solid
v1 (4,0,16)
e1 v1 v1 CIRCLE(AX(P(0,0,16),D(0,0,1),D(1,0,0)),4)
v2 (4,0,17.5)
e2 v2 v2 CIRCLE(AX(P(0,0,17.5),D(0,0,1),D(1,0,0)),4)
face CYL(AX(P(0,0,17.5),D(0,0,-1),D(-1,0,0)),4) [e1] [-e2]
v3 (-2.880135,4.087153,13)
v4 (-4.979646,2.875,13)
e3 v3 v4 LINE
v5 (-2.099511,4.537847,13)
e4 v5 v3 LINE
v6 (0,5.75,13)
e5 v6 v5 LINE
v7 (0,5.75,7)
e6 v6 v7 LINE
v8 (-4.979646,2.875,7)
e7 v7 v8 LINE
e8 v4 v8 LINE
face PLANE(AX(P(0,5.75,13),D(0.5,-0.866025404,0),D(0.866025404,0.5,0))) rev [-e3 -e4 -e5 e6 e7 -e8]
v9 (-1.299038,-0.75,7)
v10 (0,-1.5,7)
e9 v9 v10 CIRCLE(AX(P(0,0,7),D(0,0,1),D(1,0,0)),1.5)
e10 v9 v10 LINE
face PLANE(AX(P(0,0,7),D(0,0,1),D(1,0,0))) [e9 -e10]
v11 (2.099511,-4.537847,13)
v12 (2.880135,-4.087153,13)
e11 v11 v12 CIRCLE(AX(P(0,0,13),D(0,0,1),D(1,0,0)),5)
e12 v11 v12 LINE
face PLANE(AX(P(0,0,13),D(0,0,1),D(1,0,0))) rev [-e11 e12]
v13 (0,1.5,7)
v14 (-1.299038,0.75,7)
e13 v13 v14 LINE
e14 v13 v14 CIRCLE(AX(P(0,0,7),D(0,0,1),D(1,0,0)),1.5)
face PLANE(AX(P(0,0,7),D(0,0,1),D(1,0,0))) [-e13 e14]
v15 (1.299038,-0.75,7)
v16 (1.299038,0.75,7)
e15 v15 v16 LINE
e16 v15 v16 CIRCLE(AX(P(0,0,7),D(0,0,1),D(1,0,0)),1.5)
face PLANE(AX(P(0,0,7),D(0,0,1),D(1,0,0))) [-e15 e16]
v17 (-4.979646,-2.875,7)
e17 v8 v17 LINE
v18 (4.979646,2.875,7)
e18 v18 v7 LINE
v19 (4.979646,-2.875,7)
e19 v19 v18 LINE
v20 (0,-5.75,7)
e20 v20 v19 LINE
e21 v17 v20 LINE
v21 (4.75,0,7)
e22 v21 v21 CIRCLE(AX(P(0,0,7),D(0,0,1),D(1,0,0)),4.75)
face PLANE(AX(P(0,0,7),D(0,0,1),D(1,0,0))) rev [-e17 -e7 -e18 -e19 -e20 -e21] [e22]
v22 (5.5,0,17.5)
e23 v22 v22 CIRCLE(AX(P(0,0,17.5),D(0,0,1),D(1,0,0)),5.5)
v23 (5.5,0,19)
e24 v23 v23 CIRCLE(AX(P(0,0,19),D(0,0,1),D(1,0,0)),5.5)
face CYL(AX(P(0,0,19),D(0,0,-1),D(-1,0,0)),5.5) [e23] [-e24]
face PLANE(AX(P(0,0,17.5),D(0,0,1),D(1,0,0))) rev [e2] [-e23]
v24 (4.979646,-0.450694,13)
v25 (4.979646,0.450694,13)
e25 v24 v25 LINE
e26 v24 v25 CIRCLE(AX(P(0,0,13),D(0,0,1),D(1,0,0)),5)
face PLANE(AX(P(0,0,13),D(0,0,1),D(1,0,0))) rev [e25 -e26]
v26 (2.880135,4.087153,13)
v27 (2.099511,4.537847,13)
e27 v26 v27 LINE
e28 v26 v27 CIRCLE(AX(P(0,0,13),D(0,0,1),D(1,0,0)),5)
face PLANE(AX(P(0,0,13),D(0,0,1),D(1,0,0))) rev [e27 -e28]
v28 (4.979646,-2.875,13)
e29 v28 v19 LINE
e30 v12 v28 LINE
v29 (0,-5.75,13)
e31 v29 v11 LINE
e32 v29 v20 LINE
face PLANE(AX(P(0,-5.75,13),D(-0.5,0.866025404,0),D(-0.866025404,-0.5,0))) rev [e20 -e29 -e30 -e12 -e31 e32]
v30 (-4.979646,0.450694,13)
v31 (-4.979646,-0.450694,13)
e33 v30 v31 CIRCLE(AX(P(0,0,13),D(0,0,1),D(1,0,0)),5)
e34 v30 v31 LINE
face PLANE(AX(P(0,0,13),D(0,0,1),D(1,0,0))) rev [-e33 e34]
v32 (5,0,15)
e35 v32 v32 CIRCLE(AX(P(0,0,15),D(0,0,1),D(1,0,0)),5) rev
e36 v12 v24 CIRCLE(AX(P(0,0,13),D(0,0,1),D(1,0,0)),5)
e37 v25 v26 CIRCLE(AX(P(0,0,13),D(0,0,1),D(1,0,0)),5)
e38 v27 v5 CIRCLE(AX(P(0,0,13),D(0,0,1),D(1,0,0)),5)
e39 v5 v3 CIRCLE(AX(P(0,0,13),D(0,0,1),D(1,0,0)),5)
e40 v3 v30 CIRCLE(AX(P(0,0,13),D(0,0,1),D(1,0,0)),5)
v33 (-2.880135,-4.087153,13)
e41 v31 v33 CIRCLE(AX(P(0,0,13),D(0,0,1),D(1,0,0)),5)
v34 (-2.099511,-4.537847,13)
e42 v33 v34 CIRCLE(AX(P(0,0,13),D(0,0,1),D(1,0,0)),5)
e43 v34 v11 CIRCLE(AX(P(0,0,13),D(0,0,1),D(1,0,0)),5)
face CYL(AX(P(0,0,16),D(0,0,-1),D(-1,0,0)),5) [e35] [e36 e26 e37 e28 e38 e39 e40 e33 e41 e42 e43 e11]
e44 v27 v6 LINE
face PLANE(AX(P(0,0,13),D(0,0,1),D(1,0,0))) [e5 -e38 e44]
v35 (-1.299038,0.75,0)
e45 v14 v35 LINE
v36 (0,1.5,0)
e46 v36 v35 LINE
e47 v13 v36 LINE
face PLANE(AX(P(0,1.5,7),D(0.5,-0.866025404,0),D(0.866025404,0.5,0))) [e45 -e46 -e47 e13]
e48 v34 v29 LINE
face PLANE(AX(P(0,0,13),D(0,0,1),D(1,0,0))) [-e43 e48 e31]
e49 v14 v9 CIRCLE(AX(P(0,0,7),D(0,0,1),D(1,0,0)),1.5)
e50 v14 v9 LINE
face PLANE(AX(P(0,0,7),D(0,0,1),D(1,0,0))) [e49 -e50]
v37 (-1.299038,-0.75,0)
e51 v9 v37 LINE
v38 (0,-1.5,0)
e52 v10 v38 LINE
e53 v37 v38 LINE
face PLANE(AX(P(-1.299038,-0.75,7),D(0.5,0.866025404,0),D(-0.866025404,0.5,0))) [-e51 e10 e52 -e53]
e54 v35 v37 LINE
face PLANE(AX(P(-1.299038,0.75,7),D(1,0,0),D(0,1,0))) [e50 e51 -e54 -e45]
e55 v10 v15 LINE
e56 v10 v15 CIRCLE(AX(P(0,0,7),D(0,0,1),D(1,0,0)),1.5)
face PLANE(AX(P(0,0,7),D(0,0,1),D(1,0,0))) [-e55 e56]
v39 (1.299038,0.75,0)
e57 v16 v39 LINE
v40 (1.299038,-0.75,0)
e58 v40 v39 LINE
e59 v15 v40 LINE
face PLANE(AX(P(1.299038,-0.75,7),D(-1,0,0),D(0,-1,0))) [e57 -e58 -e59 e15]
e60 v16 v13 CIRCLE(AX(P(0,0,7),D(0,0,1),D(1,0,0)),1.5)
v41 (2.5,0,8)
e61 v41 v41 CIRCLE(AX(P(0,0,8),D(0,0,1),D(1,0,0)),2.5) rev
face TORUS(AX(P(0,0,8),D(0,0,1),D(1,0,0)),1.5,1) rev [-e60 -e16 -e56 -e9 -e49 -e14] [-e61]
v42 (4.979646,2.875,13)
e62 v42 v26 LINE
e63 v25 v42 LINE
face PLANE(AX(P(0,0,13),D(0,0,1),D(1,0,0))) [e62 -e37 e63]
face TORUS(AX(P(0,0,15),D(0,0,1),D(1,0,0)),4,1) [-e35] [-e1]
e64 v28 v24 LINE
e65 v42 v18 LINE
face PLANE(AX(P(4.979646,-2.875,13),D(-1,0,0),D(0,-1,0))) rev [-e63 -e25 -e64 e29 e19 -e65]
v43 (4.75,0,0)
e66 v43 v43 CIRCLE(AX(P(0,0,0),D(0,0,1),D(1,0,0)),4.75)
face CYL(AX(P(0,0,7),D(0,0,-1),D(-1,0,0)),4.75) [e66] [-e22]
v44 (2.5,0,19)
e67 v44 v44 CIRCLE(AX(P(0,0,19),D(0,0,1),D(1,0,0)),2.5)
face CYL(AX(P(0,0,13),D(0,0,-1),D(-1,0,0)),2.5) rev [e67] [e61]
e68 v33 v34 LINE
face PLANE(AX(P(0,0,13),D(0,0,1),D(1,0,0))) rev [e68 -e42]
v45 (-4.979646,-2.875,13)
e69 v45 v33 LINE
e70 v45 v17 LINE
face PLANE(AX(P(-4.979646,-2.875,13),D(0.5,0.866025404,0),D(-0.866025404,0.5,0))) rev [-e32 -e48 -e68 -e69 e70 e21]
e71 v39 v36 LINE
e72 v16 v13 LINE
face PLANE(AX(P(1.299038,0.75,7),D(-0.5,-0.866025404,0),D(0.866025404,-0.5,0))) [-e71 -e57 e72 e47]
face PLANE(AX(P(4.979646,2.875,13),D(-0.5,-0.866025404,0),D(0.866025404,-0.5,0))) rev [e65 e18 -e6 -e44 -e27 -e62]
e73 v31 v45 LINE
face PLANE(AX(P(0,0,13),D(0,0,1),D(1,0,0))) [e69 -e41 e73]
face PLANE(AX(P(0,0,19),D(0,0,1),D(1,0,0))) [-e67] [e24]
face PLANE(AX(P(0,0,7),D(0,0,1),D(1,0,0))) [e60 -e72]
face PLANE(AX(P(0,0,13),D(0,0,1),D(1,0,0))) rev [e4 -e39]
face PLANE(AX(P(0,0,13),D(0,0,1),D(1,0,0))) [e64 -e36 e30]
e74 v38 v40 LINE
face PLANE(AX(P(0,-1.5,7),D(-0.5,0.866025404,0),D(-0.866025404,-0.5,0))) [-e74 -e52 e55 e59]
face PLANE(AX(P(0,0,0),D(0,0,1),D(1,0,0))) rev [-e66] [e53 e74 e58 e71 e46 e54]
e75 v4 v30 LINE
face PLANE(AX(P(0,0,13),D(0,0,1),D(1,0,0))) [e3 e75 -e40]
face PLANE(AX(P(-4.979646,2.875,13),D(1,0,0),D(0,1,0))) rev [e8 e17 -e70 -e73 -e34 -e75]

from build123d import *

# Parameters (mm, degrees)
SKETCH1_R           = 4.75
BOSS_EXTRUDE1_DEPTH = 7
SKETCH2_R           = 2.5
BOSS_EXTRUDE2_DEPTH = 6
SKETCH3_R           = 5
SKETCH3_R_2         = 2.5
BOSS_EXTRUDE3_DEPTH = 3
SKETCH4_R           = 4
SKETCH4_R_2         = 2.5
BOSS_EXTRUDE4_DEPTH = 1.5
FILLET2_R           = 1
FILLET3_R           = 1
SKETCH5_R           = 5.5
SKETCH5_R_2         = 2.5
BOSS_EXTRUDE5_DEPTH = 1.5


with BuildPart() as part:
    # Sketch1 → Boss-Extrude1 (new body)
    with BuildSketch(Plane.XY):
        Circle(SKETCH1_R)
        Polygon((0, 1.5), (-1.299038106, 0.75), (-1.299038106, -0.75), (0, -1.5), (1.299038106, -0.75), (1.299038106, 0.75), align=None, mode=Mode.SUBTRACT)
    extrude(amount=BOSS_EXTRUDE1_DEPTH)

    # Sketch2 → Boss-Extrude2 (add)
    with BuildSketch(Plane.XY.offset(7)):
        Polygon((0, 5.75), (-4.979646072, 2.875), (-4.979646072, -2.875), (0, -5.75), (4.979646072, -2.875), (4.979646072, 2.875), align=None)
        Circle(SKETCH2_R, mode=Mode.SUBTRACT)
    extrude(amount=BOSS_EXTRUDE2_DEPTH)

    # Sketch3 → Boss-Extrude3 (add)
    with BuildSketch(Plane.XY.offset(13)):
        with Locations(Location((0, 0, 0), (0, 0, 174.828408841))):
            Circle(SKETCH3_R)
        Circle(SKETCH3_R_2, mode=Mode.SUBTRACT)
    extrude(amount=BOSS_EXTRUDE3_DEPTH)

    # Sketch4 → Boss-Extrude4 (add)
    with BuildSketch(Plane.XY.offset(16)):
        Circle(SKETCH4_R)
        Circle(SKETCH4_R_2, mode=Mode.SUBTRACT)
    extrude(amount=BOSS_EXTRUDE4_DEPTH)

    # Fillet2
    fillet2_edges = [part.edges().sort_by_distance(p)[0] for p in [
        (4.979646072, -0.450693909, 16),
    ]]
    fillet(fillet2_edges, radius=FILLET2_R - 0.0001)  # a hair under: the kernel refuses the full size

    # Fillet3
    fillet3_edges = [part.edges().sort_by_distance(p)[0] for p in [
        (-2.5, 0, 7),
    ]]
    fillet(fillet3_edges, radius=FILLET3_R - 0.0001)  # a hair under: the kernel refuses the full size

    # Sketch5 → Boss-Extrude5 (add)
    with BuildSketch(Plane.XY.offset(17.5)):
        Circle(SKETCH5_R)
        Circle(SKETCH5_R_2, mode=Mode.SUBTRACT)
    extrude(amount=BOSS_EXTRUDE5_DEPTH)


solid = part.part
